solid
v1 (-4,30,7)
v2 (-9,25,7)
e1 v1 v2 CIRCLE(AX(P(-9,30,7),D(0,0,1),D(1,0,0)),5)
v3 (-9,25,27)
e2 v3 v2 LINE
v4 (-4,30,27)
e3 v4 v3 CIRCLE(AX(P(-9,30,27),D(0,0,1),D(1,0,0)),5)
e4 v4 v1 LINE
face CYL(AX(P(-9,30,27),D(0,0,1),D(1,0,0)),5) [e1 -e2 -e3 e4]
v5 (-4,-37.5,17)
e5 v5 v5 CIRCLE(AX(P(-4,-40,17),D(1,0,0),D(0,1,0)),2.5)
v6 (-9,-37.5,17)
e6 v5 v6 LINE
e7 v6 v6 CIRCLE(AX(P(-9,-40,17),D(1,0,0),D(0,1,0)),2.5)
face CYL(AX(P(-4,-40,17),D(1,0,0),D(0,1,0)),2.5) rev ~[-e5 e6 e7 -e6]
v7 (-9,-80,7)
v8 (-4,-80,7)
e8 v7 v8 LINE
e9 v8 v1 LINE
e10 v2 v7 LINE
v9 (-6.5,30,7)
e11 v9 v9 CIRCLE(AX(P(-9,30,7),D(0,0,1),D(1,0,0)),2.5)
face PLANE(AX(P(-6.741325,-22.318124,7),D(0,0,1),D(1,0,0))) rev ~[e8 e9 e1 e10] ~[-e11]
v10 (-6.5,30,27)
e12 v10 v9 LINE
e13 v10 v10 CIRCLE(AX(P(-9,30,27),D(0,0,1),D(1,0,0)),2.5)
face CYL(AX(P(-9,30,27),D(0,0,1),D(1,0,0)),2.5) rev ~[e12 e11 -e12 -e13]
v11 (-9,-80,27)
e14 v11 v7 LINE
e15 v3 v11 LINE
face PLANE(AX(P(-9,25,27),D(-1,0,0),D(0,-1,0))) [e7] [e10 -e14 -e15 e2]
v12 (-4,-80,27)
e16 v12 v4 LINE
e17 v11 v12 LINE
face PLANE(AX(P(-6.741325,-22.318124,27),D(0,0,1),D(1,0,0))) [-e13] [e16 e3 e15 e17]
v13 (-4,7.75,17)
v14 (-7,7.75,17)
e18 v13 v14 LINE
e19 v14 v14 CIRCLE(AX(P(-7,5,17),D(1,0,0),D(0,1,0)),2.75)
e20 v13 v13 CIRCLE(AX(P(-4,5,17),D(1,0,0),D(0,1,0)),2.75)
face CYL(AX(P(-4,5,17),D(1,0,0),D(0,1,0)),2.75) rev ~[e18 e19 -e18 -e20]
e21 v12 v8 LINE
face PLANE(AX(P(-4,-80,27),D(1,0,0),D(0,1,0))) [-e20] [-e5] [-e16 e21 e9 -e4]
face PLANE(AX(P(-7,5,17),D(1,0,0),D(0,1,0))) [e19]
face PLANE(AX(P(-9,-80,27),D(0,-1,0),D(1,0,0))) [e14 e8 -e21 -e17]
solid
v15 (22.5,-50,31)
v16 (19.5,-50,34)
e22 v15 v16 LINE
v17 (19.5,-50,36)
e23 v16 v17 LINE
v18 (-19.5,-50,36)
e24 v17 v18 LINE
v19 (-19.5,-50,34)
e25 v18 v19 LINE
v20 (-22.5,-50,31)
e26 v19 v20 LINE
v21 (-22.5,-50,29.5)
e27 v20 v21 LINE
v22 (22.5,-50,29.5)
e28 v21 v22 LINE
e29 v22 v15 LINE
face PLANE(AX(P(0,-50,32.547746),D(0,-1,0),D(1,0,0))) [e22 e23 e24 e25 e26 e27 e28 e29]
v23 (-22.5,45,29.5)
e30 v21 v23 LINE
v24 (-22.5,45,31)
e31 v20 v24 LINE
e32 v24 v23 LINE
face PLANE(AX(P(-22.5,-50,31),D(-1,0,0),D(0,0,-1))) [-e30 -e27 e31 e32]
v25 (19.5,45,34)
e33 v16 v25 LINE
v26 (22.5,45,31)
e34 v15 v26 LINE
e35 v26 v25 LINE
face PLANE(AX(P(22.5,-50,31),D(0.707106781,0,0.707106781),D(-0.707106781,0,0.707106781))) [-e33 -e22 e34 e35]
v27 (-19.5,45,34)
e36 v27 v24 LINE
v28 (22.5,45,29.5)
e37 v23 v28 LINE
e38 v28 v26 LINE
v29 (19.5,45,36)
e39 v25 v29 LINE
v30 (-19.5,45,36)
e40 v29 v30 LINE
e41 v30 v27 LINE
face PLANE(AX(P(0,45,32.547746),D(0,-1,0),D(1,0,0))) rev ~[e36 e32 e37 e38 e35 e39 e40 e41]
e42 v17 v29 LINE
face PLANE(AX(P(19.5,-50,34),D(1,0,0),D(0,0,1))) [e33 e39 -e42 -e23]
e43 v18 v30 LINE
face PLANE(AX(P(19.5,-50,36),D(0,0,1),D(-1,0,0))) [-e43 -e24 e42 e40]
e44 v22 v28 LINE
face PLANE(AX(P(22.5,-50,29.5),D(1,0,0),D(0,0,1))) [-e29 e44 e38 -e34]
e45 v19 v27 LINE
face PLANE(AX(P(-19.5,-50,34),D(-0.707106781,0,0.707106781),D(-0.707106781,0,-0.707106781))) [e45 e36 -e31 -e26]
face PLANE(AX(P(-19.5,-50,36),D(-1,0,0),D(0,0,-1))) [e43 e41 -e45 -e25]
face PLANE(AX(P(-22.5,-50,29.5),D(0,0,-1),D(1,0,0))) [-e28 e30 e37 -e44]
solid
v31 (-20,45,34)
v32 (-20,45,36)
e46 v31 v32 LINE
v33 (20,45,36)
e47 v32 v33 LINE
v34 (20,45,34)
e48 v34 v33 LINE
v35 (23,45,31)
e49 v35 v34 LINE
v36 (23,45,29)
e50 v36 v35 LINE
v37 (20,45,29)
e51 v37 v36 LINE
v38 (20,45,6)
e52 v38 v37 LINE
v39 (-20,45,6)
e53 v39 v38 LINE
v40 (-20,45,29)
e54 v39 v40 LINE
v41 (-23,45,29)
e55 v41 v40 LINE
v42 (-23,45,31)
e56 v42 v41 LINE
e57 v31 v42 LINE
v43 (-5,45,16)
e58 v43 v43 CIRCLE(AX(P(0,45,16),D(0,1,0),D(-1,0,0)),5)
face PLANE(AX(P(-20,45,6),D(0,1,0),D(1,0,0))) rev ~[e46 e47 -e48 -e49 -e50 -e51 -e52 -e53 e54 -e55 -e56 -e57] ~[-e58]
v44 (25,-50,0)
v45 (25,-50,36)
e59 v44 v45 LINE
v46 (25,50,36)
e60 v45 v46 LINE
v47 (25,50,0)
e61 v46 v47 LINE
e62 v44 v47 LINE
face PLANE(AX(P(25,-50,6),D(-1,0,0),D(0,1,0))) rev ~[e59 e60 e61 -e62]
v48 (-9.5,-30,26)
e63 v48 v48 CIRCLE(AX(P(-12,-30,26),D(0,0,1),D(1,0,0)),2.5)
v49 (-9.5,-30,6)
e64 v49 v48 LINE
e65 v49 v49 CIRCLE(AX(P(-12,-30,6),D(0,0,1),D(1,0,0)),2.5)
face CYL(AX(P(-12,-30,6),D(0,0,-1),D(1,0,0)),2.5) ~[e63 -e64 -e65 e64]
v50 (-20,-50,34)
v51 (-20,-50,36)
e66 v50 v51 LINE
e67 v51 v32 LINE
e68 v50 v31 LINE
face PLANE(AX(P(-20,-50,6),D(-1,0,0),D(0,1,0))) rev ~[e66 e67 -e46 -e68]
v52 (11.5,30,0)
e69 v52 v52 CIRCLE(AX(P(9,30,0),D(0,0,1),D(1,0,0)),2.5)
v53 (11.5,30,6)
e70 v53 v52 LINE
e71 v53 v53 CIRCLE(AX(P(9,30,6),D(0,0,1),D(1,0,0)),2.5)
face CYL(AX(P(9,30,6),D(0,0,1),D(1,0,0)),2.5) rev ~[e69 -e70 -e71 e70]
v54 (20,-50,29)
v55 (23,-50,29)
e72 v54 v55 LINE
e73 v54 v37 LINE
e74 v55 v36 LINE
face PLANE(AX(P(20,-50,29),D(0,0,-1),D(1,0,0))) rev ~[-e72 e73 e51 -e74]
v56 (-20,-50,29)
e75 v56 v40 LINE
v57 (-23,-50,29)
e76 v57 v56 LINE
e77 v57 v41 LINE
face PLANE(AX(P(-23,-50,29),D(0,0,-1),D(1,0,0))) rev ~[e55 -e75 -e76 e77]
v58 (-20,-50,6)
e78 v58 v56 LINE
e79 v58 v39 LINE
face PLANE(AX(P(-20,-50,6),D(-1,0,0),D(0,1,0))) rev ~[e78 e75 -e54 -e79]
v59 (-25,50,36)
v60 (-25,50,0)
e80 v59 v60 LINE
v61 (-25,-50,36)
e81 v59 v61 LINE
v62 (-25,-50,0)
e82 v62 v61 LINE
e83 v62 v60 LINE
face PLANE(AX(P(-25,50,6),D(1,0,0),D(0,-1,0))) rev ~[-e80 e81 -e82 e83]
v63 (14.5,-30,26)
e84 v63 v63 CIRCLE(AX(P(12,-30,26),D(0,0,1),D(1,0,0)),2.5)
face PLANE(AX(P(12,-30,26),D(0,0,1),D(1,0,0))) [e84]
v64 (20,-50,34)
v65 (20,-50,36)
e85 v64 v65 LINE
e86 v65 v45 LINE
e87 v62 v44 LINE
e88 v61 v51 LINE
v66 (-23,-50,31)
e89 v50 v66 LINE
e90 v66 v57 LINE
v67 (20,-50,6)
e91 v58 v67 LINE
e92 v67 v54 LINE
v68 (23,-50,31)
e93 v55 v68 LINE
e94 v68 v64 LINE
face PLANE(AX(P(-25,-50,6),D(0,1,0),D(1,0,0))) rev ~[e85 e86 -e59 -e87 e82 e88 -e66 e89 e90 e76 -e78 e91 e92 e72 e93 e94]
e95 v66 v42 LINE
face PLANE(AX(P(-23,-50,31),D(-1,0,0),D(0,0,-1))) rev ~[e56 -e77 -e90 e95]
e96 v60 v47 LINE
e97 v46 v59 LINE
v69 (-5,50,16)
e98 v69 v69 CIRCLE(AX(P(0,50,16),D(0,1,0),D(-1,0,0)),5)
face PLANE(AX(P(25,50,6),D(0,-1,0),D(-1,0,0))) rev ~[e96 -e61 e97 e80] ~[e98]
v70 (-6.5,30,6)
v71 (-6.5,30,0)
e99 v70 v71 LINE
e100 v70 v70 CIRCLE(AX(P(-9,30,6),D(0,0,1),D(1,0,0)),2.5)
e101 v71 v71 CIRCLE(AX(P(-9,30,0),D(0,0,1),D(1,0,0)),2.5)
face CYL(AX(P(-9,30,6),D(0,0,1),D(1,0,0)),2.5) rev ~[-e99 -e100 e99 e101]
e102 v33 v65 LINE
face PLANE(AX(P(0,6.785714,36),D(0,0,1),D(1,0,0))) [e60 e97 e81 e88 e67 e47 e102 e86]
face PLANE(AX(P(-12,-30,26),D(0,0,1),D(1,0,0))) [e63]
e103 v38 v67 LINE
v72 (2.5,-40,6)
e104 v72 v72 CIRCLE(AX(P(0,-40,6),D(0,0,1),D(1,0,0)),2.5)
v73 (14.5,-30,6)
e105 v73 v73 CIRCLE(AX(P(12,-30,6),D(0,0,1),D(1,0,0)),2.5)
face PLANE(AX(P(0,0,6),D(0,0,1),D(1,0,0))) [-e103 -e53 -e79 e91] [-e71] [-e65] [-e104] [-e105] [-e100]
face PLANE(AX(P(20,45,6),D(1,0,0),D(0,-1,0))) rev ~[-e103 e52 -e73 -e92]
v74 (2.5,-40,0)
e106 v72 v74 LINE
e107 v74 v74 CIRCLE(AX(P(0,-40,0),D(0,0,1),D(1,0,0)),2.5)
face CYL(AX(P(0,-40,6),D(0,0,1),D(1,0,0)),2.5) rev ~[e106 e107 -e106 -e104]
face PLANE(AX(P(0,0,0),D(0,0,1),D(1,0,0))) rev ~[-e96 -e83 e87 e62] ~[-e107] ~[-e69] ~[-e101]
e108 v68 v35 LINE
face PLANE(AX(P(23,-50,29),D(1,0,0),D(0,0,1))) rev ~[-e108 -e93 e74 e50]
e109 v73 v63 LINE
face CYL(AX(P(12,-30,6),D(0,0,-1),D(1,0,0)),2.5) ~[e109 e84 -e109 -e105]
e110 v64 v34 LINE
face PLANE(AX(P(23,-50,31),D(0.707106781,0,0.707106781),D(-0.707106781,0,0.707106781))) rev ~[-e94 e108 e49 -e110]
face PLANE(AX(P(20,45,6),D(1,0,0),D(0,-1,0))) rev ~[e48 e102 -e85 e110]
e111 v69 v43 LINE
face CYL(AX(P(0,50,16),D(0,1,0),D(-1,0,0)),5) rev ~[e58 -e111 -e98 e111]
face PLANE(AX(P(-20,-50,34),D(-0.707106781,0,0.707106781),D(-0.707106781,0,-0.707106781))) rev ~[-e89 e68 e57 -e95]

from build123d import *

# Parameters (mm, degrees)
F0_W      = 50
F0_H      = 100
F1_DEPTH  = 6
F3_DEPTH  = 30
F5_DEPTH  = 95
F8_R      = 2.5
F9_DEPTH  = 6
F10_R     = 5
F11_DEPTH = 5
F12_DEPTH = 95
F14_R     = 2.5
F15_DEPTH = 20
F16_R     = 2.5
F17_DEPTH = 5
F16_R_2   = 2.75
F18_DEPTH = 3
F19_DEPTH = 20


# Not quite as in the source:
# - a feature names something its author has since deleted; it is built from what else it names


with BuildPart() as f1:
    # F0 (on Top) → F1 (new body)
    with BuildSketch(Plane.XY):
        Rectangle(F0_W, F0_H)
    extrude(amount=F1_DEPTH)

    # F2 (on face) → F3 (join)
    with BuildSketch(Plane.XY.offset(6)):
        Polygon((-20, 50), (-25, 50), (-25, 45), (-25, -50), (-20, -50), (-20, 45), (20, 45), (20, -50), (25, -50), (25, 45), (25, 50), (20, 50), align=None)
    extrude(amount=F3_DEPTH)

    # F4 (on face) → F5 (cut)
    with BuildSketch(Plane.XZ.offset(50)):
        Polygon((-23, 29), (-20, 29), (-20, 34), (-23, 31), align=None)
        Polygon((20, 34), (20, 29), (23, 29), (23, 31), align=None)
    extrude(amount=-F5_DEPTH, mode=Mode.SUBTRACT)

    # F8 (on face) → F9 (cut, through all)
    with BuildSketch(Plane.XY.offset(6)):
        with Locations((0, -40)):
            Circle(F8_R)
        with Locations((-9, 30)):
            Circle(F8_R)
        with Locations((9, 30)):
            Circle(F8_R)
    extrude(amount=-F9_DEPTH, mode=Mode.SUBTRACT)

    # F10 (on face) → F11 (cut, through all)
    with BuildSketch(Plane(origin=(0, 50, 0), x_dir=(-1, 0, 0), z_dir=(0, 1, 0))):
        with Locations((0, 16)):
            Circle(F10_R)
    extrude(amount=-F11_DEPTH, mode=Mode.SUBTRACT)

    # F8 (on face) → F19 (join)
    with BuildSketch(Plane.XY.offset(6)):
        with Locations((-12, -30)):
            Circle(F8_R)
        with Locations((12, -30)):
            Circle(F8_R)
    extrude(amount=F19_DEPTH)


with BuildPart() as f12:
    # F7 (on offset) → F12 (new body)
    with BuildSketch(Plane.XZ.offset(50)):
        Polygon((-22.5, 31), (-22.5, 29.5), (22.5, 29.5), (22.5, 31), (19.5, 34), (19.5, 36), (-19.5, 36), (-19.5, 34), align=None)
    extrude(amount=-F12_DEPTH)


with BuildPart() as f15:
    # F14 (on offset) → F15 (new body)
    with BuildSketch(Plane.XY.offset(27)):
        with BuildLine():
            Line((-4, -80), (-4, 30))
            ThreePointArc((-4, 30), (-12.5355339059, 33.5355339059), (-9, 25))
            Line((-9, 25), (-9, -80))
            Line((-9, -80), (-4, -80))
        make_face()
        with Locations((-9, 30)):
            Circle(F14_R, mode=Mode.SUBTRACT)
    extrude(amount=-F15_DEPTH)

    # F16 (on face) → F17 (cut, through all)
    with BuildSketch(Plane.YZ.offset(-4)):
        with Locations((-40, 17)):
            Circle(F16_R)
    extrude(amount=-F17_DEPTH, mode=Mode.SUBTRACT)

    # F16 (on face) → F18 (cut)
    with BuildSketch(Plane.YZ.offset(-4)):
        with Locations((5, 17)):
            Circle(F16_R_2)
    extrude(amount=-F18_DEPTH, mode=Mode.SUBTRACT)


solid = Compound([f1.part, f12.part, f15.part])
